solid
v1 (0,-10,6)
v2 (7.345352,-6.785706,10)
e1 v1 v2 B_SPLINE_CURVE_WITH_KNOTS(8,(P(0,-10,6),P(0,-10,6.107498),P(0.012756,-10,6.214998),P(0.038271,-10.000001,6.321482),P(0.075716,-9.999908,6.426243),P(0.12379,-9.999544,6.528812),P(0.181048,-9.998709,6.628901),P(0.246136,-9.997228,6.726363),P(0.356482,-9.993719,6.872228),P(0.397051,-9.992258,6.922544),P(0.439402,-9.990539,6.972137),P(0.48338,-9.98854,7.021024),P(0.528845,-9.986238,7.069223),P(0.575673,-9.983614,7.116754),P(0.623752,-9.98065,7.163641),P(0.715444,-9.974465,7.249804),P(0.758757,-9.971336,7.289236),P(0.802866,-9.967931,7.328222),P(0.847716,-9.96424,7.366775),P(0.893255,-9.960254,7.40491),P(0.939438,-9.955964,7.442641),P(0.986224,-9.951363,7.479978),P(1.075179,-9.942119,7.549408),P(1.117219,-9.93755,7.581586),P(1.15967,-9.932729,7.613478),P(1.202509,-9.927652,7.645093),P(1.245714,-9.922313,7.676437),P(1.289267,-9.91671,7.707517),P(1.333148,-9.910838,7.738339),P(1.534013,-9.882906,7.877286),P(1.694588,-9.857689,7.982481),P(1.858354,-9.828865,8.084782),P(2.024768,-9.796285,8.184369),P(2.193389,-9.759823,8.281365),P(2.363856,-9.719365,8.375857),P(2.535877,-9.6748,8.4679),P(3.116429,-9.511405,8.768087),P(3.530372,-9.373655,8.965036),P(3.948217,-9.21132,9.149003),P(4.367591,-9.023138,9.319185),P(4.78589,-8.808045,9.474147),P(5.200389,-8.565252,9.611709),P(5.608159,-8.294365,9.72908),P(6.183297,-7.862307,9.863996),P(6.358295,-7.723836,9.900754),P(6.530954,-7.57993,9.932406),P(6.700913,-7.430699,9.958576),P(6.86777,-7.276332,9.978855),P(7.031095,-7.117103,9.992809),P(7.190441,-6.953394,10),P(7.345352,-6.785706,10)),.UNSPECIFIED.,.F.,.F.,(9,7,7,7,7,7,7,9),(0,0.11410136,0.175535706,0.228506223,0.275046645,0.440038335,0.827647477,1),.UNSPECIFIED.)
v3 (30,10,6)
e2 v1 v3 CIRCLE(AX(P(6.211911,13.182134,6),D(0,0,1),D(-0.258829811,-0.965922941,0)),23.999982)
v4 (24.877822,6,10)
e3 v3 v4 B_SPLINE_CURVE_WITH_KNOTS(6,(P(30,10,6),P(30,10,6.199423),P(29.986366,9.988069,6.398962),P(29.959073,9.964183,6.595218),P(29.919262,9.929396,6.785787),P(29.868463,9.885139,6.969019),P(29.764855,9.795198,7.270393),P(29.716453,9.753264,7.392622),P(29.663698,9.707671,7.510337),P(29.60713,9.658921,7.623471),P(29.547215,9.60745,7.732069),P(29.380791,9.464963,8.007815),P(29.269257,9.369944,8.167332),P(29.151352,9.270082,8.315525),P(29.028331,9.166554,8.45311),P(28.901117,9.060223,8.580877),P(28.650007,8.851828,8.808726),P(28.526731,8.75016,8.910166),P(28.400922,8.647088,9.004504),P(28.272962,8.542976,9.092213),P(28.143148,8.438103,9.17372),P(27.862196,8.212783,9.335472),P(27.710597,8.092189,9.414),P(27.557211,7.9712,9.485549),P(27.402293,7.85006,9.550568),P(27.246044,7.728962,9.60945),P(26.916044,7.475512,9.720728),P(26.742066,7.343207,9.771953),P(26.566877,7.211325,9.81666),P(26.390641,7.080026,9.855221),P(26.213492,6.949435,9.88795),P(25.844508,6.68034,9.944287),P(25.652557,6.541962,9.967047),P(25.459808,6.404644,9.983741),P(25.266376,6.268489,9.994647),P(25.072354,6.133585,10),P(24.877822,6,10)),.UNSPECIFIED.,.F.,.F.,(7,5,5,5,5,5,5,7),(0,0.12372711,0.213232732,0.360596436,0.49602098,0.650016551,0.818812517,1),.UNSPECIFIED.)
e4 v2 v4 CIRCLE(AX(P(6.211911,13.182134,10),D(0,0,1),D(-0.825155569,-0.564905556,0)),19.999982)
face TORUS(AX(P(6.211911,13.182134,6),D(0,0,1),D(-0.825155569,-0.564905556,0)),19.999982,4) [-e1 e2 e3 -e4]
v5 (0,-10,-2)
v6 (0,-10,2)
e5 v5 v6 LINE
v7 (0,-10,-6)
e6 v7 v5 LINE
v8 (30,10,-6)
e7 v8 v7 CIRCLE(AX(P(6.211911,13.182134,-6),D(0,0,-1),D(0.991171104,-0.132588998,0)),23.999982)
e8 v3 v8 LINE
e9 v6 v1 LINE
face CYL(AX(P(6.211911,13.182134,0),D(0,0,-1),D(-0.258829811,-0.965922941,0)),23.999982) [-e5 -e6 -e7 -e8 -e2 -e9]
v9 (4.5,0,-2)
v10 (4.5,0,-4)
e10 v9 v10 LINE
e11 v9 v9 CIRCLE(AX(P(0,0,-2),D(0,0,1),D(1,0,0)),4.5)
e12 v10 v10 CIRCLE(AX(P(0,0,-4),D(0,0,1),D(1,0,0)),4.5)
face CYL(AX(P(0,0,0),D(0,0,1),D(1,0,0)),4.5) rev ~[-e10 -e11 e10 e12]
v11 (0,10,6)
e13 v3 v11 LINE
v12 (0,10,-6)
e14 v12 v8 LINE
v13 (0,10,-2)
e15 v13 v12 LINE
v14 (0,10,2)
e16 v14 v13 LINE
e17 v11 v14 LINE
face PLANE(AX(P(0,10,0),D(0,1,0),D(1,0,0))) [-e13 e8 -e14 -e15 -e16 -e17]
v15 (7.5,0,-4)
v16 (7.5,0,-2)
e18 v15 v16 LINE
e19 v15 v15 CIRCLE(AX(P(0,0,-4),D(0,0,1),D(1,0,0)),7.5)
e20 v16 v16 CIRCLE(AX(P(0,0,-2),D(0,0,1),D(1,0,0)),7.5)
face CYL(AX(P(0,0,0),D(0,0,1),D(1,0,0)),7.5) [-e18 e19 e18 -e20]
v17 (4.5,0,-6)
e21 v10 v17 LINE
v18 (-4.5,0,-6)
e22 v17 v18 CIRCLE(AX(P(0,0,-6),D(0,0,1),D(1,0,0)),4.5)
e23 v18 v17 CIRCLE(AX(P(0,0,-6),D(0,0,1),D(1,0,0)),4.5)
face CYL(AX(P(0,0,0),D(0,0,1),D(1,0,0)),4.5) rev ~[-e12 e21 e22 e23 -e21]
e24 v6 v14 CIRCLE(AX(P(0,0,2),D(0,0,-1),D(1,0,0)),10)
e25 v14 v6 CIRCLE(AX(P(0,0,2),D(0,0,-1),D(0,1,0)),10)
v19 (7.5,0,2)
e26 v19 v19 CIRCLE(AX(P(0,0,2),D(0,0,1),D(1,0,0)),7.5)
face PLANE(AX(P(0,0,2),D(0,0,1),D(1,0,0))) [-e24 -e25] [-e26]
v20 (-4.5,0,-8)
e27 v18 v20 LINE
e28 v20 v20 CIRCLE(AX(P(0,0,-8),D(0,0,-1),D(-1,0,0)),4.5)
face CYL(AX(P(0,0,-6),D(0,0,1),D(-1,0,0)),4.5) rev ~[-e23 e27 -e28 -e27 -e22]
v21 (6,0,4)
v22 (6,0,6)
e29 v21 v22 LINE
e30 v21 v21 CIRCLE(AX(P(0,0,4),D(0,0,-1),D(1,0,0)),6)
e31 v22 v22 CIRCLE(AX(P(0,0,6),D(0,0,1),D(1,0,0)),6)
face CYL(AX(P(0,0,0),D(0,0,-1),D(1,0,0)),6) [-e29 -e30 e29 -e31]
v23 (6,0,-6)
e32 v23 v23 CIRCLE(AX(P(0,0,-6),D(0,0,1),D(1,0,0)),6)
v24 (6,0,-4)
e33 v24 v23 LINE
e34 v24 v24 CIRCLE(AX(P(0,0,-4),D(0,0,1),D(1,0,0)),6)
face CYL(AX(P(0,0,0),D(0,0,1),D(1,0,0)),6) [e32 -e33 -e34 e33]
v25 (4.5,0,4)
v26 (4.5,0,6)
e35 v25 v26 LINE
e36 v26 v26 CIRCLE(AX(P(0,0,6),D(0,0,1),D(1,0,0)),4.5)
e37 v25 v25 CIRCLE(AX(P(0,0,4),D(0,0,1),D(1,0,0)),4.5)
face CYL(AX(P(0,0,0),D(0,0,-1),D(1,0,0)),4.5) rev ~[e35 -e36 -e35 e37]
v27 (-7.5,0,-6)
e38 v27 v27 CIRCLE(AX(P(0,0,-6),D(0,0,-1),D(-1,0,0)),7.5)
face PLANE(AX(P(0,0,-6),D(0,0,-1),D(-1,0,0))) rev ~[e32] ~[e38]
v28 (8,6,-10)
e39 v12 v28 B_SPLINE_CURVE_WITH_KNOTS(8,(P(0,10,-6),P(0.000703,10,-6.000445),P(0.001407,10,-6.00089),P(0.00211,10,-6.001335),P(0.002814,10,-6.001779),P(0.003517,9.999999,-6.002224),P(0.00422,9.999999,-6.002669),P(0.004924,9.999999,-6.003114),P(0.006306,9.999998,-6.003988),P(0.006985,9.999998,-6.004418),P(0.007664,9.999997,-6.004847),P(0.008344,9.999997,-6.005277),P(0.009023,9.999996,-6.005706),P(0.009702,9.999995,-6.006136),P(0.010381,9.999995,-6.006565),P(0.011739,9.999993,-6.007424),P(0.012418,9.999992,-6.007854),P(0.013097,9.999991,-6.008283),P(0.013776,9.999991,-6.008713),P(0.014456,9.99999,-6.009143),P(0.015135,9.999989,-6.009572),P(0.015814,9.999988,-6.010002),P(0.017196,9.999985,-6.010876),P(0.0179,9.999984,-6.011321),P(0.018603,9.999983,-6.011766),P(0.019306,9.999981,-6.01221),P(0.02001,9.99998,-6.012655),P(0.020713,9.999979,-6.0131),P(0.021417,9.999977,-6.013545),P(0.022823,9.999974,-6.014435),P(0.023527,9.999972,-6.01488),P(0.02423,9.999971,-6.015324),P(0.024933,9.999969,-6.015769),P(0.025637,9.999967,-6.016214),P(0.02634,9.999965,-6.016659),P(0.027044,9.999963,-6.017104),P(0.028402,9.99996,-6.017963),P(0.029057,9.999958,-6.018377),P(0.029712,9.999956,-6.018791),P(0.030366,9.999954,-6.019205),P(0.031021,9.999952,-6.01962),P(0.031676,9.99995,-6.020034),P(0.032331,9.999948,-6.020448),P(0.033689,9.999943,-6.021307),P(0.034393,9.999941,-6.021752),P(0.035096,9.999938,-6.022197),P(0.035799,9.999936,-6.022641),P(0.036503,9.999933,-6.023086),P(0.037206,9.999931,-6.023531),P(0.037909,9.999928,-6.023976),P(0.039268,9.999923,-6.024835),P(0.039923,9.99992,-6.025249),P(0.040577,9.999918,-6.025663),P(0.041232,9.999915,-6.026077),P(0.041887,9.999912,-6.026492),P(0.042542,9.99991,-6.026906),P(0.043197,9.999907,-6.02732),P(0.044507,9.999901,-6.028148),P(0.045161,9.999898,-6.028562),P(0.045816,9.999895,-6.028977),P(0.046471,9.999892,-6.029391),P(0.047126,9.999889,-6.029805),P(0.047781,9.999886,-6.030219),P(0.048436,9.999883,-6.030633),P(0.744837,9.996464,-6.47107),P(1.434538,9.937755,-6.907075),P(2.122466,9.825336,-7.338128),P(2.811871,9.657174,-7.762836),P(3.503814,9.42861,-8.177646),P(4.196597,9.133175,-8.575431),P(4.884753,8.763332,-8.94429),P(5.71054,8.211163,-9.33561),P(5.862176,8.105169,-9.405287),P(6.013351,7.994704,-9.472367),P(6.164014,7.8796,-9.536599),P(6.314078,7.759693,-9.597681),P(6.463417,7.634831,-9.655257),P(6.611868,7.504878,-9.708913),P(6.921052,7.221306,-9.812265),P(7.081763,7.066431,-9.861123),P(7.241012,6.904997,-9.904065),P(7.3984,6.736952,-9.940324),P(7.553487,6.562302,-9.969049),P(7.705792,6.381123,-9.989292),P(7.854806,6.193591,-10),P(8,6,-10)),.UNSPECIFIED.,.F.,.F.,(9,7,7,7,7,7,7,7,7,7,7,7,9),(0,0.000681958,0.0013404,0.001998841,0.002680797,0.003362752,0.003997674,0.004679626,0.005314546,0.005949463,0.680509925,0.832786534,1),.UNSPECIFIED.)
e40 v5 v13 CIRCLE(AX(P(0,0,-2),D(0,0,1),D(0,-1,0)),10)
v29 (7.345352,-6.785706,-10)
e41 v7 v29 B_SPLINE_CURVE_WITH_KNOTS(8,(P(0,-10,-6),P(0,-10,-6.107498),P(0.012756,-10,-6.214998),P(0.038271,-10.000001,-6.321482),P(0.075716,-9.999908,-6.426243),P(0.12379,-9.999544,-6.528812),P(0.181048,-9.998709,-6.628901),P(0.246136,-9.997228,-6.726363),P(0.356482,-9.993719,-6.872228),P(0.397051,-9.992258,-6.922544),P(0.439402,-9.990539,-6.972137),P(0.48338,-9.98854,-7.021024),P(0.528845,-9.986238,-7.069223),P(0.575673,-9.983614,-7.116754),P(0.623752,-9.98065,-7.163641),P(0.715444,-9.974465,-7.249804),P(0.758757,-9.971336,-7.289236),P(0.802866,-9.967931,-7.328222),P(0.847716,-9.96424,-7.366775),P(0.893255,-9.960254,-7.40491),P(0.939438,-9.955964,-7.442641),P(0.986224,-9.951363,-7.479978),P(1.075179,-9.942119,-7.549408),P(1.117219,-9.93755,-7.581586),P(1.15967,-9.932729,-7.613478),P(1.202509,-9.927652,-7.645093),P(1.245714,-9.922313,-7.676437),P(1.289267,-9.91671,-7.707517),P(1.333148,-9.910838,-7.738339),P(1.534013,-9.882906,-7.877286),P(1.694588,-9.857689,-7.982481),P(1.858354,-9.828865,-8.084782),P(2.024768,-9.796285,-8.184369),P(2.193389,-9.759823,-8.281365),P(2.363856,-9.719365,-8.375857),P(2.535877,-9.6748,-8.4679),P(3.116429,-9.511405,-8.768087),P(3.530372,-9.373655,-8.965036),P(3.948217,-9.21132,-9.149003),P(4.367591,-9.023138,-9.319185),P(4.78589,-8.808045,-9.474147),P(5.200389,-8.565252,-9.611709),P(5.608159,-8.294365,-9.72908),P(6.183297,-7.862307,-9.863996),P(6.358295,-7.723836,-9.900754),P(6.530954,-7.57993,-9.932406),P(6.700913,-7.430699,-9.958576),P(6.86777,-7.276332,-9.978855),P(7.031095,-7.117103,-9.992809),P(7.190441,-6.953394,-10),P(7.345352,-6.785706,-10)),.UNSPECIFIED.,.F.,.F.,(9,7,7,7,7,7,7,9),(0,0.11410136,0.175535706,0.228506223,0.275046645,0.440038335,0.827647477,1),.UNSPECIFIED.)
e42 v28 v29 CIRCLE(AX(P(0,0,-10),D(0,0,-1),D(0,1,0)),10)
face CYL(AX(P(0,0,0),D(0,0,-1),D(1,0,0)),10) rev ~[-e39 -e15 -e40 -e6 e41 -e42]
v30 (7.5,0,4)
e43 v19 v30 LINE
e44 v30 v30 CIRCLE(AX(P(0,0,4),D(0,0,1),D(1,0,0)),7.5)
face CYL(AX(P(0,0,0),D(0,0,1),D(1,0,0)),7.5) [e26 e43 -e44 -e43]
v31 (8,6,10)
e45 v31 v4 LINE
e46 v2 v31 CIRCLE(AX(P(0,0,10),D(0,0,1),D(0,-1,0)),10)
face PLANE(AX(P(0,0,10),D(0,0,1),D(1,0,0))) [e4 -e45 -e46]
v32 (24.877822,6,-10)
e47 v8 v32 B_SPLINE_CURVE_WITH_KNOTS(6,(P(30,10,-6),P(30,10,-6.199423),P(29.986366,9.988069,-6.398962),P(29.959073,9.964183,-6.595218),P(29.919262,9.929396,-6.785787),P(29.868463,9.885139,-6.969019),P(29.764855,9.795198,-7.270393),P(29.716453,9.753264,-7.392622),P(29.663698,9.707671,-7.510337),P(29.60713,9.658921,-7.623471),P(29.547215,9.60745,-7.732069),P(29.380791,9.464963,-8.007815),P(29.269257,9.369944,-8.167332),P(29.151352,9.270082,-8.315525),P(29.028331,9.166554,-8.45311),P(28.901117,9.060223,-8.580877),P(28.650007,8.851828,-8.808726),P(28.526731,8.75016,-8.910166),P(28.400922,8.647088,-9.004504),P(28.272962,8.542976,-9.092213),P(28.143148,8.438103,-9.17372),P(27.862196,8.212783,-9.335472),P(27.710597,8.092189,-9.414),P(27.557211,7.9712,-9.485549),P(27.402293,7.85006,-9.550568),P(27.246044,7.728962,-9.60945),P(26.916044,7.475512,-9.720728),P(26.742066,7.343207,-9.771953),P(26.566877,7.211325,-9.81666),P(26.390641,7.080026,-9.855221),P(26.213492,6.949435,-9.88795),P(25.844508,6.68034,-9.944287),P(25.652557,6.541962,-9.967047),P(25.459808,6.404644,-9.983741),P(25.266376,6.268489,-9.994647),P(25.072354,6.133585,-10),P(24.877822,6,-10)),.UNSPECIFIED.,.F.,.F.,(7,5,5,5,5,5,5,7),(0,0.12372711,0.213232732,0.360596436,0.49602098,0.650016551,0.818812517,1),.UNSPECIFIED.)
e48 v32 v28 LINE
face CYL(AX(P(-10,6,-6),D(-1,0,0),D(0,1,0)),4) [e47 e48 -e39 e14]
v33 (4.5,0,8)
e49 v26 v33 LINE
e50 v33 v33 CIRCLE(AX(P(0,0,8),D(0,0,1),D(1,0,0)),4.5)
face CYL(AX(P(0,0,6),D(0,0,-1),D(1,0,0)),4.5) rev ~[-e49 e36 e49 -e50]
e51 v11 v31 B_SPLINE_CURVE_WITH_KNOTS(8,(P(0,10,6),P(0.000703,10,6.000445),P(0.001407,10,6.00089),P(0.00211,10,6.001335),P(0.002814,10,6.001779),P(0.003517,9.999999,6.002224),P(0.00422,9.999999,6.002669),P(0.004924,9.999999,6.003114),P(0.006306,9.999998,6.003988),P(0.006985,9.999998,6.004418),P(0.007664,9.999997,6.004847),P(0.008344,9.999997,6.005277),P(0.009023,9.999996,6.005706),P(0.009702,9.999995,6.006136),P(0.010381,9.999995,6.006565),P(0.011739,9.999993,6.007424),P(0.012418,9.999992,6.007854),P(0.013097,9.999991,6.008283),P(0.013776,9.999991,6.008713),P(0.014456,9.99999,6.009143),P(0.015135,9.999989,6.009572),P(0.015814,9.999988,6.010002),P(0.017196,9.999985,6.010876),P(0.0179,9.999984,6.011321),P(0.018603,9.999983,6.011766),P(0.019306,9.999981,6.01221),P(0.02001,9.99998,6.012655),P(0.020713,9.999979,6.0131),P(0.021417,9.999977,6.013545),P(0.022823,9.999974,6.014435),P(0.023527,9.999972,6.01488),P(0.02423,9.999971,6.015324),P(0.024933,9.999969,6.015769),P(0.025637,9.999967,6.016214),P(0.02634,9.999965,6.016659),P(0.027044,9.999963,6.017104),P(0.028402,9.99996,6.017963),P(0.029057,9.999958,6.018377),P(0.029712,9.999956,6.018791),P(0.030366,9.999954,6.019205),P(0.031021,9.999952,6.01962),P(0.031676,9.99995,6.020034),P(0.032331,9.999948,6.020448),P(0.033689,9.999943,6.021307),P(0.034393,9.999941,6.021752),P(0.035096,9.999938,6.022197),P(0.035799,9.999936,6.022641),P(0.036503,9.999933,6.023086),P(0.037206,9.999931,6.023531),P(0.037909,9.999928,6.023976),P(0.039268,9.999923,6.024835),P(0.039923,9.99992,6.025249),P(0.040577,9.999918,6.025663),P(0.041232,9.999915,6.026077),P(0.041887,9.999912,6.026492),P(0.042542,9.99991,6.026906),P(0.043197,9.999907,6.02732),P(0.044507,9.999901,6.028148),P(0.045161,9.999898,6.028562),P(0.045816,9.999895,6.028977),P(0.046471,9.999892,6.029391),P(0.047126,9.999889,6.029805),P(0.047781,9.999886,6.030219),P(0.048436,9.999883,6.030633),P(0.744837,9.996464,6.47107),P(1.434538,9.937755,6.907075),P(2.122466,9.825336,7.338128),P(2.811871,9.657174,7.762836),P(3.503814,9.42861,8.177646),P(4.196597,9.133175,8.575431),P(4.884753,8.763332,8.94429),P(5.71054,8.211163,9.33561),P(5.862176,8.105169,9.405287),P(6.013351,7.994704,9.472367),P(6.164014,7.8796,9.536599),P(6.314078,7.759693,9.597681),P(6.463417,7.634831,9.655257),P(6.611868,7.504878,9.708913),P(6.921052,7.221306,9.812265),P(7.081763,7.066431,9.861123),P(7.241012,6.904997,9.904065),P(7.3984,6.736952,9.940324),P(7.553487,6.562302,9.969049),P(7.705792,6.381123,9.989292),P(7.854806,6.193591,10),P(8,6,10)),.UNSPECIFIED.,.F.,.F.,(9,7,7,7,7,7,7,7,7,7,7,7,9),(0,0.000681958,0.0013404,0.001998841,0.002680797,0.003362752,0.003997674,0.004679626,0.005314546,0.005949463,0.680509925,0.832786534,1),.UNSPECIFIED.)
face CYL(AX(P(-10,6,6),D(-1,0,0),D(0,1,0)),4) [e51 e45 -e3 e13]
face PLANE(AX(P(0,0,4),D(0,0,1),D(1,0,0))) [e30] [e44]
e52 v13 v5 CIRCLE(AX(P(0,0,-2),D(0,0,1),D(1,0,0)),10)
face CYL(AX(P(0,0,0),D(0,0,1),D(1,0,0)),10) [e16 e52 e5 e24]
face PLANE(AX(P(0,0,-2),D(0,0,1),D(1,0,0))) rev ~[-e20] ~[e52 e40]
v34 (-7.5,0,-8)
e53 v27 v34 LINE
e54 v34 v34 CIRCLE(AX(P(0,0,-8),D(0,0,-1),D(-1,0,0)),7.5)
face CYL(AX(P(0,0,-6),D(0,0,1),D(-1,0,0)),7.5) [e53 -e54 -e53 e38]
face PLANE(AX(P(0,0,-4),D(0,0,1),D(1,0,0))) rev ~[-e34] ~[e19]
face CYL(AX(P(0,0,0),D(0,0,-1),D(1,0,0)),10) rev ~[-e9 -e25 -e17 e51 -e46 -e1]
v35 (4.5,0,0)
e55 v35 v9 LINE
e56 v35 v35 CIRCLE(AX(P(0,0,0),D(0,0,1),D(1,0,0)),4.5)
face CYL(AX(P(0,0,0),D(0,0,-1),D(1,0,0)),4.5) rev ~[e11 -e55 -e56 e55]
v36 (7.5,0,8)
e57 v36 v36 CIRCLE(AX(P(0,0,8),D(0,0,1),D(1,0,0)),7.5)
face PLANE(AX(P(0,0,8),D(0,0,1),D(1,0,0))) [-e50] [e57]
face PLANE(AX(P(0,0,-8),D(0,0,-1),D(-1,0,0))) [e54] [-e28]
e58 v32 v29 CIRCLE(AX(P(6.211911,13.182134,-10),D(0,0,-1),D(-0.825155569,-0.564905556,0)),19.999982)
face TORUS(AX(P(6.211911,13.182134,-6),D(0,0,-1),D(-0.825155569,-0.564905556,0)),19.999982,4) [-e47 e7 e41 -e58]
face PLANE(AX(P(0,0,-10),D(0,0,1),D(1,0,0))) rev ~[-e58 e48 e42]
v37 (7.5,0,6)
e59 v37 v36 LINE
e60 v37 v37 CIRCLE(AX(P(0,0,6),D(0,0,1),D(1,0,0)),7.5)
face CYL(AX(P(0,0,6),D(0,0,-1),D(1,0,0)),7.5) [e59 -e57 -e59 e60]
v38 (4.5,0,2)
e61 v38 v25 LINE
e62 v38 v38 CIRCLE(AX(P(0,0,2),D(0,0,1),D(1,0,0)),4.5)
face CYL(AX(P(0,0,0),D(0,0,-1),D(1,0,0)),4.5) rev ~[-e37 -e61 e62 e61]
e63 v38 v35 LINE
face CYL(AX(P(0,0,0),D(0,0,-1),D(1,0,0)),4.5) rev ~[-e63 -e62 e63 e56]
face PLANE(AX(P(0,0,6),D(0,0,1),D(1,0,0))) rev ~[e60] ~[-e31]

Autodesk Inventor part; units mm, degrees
ref_plane "YZ Plane" through (0, 0, 0) normal (1, 0, 0) x (0, 1, 0)
ref_plane "XZ Plane" through (0, 0, 0) normal (0, 1, 0) x (-1, 0, 0)
ref_plane "XY Plane" through (0, 0, 0) normal (0, 0, 1) x (1, 0, 0)
sketch "Sketch1" plane through (0, 0, 0) normal (0, 0, 1) x (1, 0, 0)
  circle A0 centre (0, 0) radius 10
  line L0 (0, 10) -> (30, 10)
  arc A1 (0, -10) -> (30, 10) centre (6.2119, 13.1822) ccw
  circle A2 centre (0, 0) radius 4.5
  circle A3 centre (0, 0) radius 7.5
  circle A4 centre (0, 0) radius 6
  dimension "d0" = 20
  dimension "d1" = 30
  dimension "d2" = 24
  dimension "d3" = 10
  dimension "d4" = 13.1822
  dimension "d5" = 9
  dimension "d6" = 15
  dimension "d7" = 12
extrude "Extrusion1" add sketch "Sketch1" along normal mid plane 20 contours A0 L0 A1
extrude "Extrusion2" add sketch "Sketch1" along normal mid plane 4 contours A0 | A3 | A4
extrude "Extrusion3" add sketch "Sketch1" along normal mid plane 8 contours A3 | A4
extrude "Extrusion4" add sketch "Sketch1" along normal mid plane 12 contours A4
sketch "Sketch2" plane through (0, 0, 6) normal (0, 0, 1) x (1, 0, 0)
  circle A0 centre (0, 0) radius 7.5
  circle A1 centre (0, 0) radius 4.5
  dimension "d16" = 15
  dimension "d18" = 9
sketch "Sketch3" plane through (0, 0, -6) normal (0, 0, -1) x (-1, 0, 0)
  circle A0 centre (0, 0) radius 7.5
  circle A1 centre (0, 0) radius 4.5
  dimension "d17" = 15
  dimension "d19" = 9
extrude "Extrusion5" add sketch "Sketch3" along normal blind 2
extrude "Extrusion6" add sketch "Sketch2" along normal blind 2
fillet "Fillet1" radius 4 4 edges at (15, 10, -10) (19.5247, -6.7871, -10) (19.5247, -6.7871, 10) (15, 10, 10)
properties part number "TapPart"
